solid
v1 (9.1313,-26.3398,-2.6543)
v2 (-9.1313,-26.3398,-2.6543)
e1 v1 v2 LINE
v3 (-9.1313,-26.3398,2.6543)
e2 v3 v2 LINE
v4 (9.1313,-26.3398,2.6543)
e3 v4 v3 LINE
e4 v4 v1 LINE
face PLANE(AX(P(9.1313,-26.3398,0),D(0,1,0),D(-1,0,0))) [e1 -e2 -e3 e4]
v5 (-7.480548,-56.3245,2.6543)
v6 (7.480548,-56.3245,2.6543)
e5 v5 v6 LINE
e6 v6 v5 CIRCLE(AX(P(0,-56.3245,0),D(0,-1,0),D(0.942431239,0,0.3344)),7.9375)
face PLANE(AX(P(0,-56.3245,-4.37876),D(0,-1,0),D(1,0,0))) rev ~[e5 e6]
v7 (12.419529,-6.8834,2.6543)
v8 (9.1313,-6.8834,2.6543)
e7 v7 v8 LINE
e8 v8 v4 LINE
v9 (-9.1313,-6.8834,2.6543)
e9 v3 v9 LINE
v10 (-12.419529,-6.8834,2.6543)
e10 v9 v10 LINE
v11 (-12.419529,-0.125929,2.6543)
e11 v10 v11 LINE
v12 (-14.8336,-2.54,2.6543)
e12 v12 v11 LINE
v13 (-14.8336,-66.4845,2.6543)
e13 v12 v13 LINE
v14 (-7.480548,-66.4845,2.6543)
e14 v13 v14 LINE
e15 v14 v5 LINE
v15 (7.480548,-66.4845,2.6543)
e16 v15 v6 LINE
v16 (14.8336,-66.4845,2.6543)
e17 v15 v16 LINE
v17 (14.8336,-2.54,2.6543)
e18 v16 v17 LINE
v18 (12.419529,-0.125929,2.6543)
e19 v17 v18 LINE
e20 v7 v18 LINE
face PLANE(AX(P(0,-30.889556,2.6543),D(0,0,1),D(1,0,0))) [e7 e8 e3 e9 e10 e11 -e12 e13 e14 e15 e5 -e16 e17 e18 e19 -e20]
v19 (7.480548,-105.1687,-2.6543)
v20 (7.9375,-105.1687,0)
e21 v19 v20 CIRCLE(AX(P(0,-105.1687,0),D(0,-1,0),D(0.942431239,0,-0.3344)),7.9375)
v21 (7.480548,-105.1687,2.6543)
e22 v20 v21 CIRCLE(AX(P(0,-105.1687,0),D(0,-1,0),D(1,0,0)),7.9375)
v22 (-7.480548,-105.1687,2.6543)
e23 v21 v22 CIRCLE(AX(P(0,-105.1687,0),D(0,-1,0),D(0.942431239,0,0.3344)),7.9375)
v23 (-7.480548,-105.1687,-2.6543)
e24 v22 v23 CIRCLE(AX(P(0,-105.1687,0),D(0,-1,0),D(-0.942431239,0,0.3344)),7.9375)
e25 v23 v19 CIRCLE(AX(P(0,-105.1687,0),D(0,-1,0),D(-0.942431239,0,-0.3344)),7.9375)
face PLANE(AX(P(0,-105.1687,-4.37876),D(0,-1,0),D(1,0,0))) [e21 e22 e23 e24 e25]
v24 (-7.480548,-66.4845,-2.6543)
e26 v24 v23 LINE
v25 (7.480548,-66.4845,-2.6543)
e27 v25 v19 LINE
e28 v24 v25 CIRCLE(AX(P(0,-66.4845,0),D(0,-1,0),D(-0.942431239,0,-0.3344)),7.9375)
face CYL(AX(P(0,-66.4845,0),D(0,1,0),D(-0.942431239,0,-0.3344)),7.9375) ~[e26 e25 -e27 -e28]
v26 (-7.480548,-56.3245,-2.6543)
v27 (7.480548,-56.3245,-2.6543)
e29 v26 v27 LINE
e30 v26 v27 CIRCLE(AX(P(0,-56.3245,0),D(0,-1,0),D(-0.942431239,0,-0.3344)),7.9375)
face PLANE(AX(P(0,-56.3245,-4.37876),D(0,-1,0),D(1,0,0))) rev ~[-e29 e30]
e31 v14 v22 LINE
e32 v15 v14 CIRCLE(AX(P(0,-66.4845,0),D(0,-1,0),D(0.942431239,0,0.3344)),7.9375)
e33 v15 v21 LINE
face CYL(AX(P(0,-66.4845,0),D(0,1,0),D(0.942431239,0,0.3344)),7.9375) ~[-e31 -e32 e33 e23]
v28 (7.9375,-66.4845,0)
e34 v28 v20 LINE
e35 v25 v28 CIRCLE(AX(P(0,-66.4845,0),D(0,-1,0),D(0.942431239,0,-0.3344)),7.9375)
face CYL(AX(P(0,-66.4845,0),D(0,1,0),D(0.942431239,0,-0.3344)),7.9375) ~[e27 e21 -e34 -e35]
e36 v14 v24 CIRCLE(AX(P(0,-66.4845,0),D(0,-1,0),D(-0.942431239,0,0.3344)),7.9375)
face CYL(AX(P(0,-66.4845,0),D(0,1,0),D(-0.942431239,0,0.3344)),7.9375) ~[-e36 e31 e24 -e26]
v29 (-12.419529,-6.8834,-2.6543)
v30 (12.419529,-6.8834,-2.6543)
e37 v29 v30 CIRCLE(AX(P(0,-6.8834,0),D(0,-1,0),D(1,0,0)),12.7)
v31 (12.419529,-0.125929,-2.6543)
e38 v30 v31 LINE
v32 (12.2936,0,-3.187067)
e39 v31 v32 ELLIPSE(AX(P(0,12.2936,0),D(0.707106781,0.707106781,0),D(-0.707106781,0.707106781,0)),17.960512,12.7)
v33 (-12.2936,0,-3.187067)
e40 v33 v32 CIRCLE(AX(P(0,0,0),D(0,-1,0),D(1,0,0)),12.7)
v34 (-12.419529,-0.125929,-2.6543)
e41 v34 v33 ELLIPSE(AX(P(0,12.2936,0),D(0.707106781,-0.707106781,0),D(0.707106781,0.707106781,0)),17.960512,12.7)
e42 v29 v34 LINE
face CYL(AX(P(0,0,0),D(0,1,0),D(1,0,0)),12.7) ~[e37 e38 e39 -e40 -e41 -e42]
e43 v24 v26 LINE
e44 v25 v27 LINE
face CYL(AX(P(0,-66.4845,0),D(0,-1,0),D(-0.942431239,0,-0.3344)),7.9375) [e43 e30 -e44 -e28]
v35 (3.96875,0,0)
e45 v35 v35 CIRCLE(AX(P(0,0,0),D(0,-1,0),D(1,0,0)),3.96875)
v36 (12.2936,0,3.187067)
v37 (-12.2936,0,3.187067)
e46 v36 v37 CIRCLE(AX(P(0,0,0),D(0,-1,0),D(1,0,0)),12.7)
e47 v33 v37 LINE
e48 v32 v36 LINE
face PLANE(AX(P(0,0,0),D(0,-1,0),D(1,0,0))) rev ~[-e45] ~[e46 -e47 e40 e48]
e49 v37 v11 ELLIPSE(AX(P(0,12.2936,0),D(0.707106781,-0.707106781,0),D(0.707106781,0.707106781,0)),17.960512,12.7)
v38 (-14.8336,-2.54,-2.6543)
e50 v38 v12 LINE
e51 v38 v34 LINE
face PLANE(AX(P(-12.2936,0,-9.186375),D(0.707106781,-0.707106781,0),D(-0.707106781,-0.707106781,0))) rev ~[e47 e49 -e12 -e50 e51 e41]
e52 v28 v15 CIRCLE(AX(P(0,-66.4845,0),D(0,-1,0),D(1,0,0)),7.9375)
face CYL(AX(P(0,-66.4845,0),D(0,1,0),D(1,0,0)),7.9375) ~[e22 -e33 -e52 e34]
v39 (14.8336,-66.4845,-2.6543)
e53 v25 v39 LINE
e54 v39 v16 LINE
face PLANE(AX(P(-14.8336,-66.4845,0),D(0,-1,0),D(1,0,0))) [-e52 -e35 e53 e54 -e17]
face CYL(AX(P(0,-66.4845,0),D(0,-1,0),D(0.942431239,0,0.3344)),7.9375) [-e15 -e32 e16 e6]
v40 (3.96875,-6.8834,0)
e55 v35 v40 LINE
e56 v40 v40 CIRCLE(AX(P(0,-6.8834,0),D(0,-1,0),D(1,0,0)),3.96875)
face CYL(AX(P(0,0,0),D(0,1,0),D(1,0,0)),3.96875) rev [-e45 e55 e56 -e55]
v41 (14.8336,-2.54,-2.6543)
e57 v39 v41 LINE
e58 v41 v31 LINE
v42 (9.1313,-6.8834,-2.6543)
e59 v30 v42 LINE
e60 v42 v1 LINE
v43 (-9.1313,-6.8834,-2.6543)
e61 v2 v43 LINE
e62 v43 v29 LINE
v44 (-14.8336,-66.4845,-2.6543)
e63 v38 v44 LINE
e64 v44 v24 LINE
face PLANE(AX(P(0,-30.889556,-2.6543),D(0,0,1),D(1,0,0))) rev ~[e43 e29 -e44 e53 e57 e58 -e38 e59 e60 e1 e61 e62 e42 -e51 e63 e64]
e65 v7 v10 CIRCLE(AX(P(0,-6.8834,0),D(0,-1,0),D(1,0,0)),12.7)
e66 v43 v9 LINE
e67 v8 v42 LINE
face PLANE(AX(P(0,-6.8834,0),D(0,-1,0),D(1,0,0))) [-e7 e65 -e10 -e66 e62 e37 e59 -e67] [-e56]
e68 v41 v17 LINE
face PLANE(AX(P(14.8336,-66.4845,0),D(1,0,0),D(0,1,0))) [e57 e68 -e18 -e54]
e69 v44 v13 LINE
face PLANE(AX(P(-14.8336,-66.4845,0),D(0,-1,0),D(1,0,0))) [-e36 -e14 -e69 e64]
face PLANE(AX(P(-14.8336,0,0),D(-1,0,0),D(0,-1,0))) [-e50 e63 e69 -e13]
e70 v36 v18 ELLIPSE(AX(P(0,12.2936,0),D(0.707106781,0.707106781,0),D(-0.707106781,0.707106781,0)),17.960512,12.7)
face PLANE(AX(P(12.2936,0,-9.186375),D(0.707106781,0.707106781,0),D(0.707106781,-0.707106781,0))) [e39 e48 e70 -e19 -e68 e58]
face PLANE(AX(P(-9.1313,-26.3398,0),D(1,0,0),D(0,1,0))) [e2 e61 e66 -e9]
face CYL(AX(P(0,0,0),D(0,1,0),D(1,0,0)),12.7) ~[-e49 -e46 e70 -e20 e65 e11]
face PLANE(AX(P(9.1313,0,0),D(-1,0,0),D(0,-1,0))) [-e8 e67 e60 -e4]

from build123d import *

# Parameters (mm, degrees)
F0_R          = 12.7
F0_R_2        = 3.96875
F1_DEPTH      = 6.8834
F3_DEPTH      = 2.6543
F4_T1_DEPTH   = 18.3727495789
F6_DEPTH      = 38.6842
F6_DEPTH_BACK = 10.16


# Not quite as in the source:
# - a fillet or chamfer that OpenCascade refuses, or shapes differently, is made with other operations: its cross-section is extruded or revolved along the edge and cut away or added


with BuildPart() as f1:
    # F0 (on Front) → F1 (new body)
    with BuildSketch(Plane.XZ):
        Circle(F0_R)
        Circle(F0_R_2, mode=Mode.SUBTRACT)
    extrude(amount=F1_DEPTH)

    # F2 (on Top) → F3 (join, symmetric)
    with BuildSketch(Plane.XY):
        Polygon((-9.1313, 0), (-14.8336, 0), (-14.8336, -66.4845), (14.8336, -66.4845), (14.8336, 0), (9.1313, 0), (9.1313, -26.3398), (-9.1313, -26.3398), align=None)
    extrude(amount=F3_DEPTH, both=True)

    # F4: chamfer of 2.54 on 2 edges, made by hand

    # F4_s2 → F4_t1 (cut)
    with BuildSketch(Plane.XY.offset(-9.1863747894)):
        Polygon((12.2936, 0), (14.8336, -2.54), (14.8336, 0), align=None)
        Polygon((-12.2936, 0), (-14.8336, -2.54), (-14.8336, 0), align=None)
    extrude(amount=F4_T1_DEPTH, mode=Mode.SUBTRACT)

    # F5 (on face) → F6 (join, two sides)
    with BuildSketch(Plane.XZ.offset(66.4845)) as f6_sk:
        with BuildLine():
            ThreePointArc((-7.4805479585, -2.6543), (0, -7.9375), (7.4805479585, -2.6543))
            Line((7.4805479585, -2.6543), (-7.4805479585, -2.6543))
        make_face()
        with BuildLine():
            ThreePointArc((7.4805479585, -2.6543), (7.8224278735, -1.3466730912), (7.9375, 0))
            ThreePointArc((7.9375, 0), (7.8224278735, 1.3466730912), (7.4805479585, 2.6543))
            Line((7.4805479585, 2.6543), (-7.4805479585, 2.6543))
            ThreePointArc((-7.4805479585, 2.6543), (-7.9375, 0), (-7.4805479585, -2.6543))
            Line((-7.4805479585, -2.6543), (7.4805479585, -2.6543))
        make_face()
        with BuildLine():
            Line((-7.4805479585, 2.6543), (7.4805479585, 2.6543))
            ThreePointArc((7.4805479585, 2.6543), (0, 7.9375), (-7.4805479585, 2.6543))
        make_face()
    extrude(amount=F6_DEPTH)
    extrude(f6_sk.sketch, amount=-F6_DEPTH_BACK)


solid = f1.part
